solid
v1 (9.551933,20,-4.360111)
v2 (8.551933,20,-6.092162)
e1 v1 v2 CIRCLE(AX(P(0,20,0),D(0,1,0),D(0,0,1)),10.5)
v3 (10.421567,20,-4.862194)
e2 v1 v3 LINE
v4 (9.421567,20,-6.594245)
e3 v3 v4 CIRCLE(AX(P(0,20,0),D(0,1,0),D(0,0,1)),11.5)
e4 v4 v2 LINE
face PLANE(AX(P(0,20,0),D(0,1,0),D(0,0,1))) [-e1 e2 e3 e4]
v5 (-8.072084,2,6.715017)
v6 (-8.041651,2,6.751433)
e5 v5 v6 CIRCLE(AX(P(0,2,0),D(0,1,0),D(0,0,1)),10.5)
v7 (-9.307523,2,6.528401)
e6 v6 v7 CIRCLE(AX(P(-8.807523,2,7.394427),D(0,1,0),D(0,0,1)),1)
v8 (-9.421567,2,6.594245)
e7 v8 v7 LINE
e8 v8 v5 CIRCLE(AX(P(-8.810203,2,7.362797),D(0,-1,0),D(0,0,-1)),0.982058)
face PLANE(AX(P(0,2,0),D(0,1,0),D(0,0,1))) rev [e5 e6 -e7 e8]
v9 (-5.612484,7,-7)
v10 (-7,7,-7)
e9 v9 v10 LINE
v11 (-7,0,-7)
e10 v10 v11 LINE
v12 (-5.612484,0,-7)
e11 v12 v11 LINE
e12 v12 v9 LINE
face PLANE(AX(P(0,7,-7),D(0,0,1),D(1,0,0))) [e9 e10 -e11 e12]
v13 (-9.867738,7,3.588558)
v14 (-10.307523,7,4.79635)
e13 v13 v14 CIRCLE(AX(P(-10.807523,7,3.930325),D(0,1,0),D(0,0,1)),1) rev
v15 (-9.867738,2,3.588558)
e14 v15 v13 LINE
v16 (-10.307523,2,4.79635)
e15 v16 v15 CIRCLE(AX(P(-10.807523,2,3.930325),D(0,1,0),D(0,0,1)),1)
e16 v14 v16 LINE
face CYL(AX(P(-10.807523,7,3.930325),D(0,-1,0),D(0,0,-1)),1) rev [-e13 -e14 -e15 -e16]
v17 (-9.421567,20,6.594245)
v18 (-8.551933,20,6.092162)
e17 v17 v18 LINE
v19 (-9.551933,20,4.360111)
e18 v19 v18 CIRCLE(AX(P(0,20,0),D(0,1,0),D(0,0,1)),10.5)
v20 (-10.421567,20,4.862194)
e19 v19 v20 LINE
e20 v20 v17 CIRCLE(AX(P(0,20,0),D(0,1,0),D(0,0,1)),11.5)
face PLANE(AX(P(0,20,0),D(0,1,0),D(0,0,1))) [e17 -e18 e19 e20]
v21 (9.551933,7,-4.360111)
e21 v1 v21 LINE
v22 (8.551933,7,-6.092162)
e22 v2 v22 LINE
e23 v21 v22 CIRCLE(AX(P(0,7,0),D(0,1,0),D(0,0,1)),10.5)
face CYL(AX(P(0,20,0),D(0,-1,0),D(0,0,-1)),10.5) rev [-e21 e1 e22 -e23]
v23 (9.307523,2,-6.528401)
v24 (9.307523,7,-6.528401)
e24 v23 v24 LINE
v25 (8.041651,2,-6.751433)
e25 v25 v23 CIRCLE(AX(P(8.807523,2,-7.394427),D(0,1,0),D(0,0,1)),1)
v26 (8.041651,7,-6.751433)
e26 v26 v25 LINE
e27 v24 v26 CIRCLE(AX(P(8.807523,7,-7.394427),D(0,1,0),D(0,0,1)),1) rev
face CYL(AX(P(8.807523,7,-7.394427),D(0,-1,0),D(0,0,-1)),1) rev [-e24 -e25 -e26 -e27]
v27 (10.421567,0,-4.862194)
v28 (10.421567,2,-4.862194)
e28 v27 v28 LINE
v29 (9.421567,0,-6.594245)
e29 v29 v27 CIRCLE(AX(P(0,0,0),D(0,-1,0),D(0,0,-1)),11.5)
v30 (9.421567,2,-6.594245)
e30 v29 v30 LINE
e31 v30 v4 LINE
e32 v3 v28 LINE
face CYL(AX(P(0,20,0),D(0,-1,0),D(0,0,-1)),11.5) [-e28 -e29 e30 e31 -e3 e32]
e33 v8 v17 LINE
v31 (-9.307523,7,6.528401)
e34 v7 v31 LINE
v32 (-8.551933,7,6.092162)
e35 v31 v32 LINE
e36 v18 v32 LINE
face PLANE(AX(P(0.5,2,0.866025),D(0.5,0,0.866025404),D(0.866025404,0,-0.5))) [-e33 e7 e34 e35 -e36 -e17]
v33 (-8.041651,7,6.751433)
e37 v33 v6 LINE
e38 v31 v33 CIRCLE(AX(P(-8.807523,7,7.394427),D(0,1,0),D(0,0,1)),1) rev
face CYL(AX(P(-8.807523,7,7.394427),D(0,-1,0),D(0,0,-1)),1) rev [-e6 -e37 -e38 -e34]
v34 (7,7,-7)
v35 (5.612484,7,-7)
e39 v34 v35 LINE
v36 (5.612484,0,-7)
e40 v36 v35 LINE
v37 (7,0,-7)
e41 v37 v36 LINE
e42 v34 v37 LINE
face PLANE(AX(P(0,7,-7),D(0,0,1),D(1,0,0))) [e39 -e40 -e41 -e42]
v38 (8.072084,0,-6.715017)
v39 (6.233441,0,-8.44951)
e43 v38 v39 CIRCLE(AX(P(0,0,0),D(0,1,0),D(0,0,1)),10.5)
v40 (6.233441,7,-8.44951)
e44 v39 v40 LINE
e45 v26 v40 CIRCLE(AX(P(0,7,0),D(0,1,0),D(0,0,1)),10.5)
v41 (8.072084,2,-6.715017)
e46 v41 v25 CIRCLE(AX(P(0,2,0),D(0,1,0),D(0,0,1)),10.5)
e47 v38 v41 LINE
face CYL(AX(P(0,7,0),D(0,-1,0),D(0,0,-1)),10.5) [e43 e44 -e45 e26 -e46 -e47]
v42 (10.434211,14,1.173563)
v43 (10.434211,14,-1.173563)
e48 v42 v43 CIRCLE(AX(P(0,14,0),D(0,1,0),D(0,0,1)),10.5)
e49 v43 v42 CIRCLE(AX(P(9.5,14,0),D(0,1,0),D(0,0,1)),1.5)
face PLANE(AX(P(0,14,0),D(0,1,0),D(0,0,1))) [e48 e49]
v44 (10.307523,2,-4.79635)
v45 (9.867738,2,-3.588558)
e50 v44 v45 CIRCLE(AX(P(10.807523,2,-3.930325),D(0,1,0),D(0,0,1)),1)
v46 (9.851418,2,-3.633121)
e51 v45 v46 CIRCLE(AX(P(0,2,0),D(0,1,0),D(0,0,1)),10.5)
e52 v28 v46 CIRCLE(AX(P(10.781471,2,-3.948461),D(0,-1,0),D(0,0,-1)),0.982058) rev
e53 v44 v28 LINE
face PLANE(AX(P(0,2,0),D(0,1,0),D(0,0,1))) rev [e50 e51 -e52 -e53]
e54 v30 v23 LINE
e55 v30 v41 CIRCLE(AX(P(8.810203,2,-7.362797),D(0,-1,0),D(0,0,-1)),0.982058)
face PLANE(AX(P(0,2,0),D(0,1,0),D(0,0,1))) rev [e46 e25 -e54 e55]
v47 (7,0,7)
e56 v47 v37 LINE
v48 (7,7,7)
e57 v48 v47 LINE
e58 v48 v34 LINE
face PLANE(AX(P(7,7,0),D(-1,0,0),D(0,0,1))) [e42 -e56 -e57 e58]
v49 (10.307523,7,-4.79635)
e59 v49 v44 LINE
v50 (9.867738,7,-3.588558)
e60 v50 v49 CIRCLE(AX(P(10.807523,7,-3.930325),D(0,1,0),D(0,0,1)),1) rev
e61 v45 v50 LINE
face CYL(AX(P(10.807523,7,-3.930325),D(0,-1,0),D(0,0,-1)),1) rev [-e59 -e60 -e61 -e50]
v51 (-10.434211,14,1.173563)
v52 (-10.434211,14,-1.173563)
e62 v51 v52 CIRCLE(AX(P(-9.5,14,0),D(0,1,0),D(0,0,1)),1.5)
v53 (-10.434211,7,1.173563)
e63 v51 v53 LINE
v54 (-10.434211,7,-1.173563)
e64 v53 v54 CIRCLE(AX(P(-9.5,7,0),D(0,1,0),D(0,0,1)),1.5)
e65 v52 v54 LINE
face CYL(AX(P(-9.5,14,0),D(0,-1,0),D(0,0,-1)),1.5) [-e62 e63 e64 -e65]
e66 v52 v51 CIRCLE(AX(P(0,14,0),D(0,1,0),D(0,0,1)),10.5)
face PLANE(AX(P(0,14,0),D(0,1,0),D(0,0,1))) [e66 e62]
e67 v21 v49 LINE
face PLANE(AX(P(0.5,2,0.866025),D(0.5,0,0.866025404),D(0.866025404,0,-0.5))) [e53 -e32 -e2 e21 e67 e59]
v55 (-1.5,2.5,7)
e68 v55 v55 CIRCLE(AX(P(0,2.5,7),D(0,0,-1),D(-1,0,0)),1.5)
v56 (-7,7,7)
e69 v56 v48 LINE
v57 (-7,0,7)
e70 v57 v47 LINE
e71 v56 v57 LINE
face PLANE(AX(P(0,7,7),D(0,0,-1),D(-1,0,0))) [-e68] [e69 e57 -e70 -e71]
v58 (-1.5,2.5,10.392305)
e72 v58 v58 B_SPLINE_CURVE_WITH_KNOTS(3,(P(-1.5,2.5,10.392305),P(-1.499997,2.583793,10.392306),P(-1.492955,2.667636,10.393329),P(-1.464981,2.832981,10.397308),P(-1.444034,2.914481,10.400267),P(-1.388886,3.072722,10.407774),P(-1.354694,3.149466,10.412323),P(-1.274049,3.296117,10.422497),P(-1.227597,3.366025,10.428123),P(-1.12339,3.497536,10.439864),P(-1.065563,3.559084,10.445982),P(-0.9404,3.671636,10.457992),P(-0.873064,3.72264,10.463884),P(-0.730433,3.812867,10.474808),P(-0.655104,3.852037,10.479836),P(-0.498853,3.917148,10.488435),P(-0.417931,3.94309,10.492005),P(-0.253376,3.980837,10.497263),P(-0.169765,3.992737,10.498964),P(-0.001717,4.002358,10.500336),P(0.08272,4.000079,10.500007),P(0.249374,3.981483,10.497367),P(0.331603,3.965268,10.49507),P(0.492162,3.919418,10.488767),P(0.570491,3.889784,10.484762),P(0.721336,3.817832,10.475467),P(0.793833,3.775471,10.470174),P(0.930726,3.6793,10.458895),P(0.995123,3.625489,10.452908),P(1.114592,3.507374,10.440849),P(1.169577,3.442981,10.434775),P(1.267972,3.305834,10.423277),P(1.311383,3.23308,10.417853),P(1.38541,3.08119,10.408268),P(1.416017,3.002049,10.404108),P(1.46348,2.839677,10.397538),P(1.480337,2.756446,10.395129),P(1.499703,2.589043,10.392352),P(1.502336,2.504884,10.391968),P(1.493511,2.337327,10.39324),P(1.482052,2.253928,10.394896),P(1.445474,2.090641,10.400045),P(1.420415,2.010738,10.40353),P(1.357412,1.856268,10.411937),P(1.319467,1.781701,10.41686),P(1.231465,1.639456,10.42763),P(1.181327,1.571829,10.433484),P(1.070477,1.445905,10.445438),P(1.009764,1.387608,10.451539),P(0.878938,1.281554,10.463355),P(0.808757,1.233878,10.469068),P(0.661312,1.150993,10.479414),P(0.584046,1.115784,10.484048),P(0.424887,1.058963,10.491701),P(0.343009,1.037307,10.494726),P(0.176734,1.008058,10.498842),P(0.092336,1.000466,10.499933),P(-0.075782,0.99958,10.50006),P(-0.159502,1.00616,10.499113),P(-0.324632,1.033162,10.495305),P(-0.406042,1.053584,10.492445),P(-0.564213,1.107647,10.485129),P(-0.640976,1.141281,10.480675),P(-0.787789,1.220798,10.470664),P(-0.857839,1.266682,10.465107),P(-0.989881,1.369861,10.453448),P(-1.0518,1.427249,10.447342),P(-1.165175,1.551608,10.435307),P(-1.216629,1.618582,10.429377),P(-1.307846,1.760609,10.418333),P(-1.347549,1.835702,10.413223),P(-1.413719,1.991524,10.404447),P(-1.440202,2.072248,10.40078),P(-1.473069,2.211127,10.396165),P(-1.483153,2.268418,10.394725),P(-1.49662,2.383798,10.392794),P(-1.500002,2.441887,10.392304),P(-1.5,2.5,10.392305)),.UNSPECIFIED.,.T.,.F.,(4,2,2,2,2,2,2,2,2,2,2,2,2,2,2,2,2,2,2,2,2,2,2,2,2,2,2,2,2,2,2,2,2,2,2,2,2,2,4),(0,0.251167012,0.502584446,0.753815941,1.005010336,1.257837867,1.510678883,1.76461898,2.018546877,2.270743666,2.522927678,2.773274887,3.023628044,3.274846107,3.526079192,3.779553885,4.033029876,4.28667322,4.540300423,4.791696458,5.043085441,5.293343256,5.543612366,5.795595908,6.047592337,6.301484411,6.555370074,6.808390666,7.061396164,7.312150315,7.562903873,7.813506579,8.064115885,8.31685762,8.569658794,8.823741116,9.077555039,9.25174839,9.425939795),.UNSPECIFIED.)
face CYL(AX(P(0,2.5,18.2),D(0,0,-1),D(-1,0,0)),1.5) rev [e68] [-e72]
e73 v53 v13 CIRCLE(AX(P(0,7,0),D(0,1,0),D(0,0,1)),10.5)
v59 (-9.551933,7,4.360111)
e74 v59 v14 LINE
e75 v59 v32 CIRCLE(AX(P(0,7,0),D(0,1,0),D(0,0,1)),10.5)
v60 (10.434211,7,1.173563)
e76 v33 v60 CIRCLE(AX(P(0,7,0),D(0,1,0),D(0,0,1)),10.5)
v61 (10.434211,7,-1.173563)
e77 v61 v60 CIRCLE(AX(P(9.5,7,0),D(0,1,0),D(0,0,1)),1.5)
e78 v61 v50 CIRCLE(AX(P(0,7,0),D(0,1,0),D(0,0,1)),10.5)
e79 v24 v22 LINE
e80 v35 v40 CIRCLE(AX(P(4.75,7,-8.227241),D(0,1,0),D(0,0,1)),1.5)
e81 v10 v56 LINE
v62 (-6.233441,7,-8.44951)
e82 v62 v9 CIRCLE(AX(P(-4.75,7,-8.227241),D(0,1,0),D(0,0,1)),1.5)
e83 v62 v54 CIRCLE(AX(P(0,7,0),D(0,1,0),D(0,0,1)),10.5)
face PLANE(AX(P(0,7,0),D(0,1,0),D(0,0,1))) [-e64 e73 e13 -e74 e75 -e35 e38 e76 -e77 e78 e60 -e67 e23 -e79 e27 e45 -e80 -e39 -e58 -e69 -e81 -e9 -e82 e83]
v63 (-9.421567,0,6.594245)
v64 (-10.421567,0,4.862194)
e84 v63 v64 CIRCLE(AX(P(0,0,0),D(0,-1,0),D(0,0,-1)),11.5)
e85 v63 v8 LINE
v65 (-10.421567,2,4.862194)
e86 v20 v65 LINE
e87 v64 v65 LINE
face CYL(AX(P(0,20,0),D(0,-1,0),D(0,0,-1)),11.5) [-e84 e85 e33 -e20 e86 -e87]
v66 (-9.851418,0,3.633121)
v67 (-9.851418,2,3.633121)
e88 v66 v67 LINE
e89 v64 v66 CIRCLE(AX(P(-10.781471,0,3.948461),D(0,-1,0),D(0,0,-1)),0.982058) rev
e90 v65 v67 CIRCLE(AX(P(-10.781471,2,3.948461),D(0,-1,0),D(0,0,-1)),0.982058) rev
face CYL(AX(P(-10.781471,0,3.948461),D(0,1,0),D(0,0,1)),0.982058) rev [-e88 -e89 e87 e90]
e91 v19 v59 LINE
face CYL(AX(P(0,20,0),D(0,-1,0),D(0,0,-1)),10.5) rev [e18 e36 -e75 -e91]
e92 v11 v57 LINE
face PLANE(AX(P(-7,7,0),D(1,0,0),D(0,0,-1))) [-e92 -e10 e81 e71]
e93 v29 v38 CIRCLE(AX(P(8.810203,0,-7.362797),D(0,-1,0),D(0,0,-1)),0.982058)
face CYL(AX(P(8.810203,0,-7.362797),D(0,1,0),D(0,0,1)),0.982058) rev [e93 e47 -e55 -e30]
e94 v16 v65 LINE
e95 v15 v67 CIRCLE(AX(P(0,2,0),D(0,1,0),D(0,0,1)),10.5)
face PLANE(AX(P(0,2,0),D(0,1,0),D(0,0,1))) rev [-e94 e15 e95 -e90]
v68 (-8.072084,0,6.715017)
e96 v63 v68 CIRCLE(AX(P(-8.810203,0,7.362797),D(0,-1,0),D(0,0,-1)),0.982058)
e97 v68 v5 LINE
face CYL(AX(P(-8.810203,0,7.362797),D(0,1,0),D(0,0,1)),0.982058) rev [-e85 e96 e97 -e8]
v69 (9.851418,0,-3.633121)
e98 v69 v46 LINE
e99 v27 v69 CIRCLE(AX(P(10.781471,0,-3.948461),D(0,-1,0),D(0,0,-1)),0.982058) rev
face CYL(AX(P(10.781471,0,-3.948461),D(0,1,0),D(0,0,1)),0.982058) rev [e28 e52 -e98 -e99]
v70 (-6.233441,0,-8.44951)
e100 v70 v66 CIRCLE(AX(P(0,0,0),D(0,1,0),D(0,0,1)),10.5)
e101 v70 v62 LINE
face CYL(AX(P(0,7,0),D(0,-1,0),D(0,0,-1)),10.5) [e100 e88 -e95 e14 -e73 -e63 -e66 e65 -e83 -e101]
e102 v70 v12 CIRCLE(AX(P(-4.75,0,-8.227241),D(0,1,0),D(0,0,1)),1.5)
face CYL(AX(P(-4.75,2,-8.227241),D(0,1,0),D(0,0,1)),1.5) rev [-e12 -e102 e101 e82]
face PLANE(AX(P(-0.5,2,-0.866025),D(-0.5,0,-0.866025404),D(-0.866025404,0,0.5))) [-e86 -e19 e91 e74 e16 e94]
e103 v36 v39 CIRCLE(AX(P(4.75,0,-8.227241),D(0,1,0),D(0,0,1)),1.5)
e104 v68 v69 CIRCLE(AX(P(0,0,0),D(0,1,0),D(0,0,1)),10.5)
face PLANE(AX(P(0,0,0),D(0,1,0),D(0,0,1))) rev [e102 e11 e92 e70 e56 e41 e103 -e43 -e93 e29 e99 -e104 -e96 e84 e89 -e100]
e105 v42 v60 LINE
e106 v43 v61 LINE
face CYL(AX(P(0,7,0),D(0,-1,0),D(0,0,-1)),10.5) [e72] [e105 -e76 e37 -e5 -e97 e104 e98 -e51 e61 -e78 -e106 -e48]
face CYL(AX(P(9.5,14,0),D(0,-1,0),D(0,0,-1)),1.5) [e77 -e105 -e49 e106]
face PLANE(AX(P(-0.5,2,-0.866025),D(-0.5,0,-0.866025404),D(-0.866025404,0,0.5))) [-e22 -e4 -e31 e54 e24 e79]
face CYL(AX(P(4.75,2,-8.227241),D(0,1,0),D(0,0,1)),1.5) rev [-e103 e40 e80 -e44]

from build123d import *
from build123d.topology import SkipClean

# Parameters (mm, degrees)
SKETCH1_R               = 10.5
BOSS_EXTRUDE1_DEPTH     = 7
BOSS_EXTRUDE2_DEPTH     = 7
BOSS_EXTRUDE4_START     = -5
BOSS_EXTRUDE4_DEPTH     = 5
SKETCH5_R               = 1.5
CUT_EXTRUDE2_DEPTH      = 5
BOSS_EXTRUDE5_DEPTH     = 13
CUT_EXTRUDE4_DEPTH      = 26.013546021
CUT_EXTRUDE4_DEPTH_BACK = 26.013546021
FILLET1_R               = 1
CUT_EXTRUDE5_DEPTH      = 20.866491554
CUT_EXTRUDE5_DEPTH_BACK = 20.866491554
SKETCH9_R               = 15
SKETCH9_R_2             = 11.5
SKETCH10_R              = 1.5
CUT_EXTRUDE6_DEPTH      = 11.2
CUT_EXTRUDE7_DEPTH      = 24.334523869
CUT_EXTRUDE7_DEPTH_BACK = 24.334523869
SKETCH12_R              = 4.652991158
SKETCH12_R_2            = 1.5
BOSS_EXTRUDE6_START     = 2
BOSS_EXTRUDE6_DEPTH     = 2


with BuildPart() as part:
    # Sketch1 → Boss-Extrude1 (new body)
    with BuildSketch(Plane(origin=(0, 0, 0), x_dir=(1, 0, 0), z_dir=(0, 1, 0))):
        with Locations(Location((0, 0, 0), (0, 0, 270))):
            Circle(SKETCH1_R)
        Polygon((7, -7), (7, 0), (7, 7), (-7, 7), (-7, -7), align=None, mode=Mode.SUBTRACT)
    extrude(amount=BOSS_EXTRUDE1_DEPTH)

    # Sketch2 → Boss-Extrude2 (add)
    with BuildSketch(Plane(origin=(0, 7, 0), x_dir=(1, 0, 0), z_dir=(0, 1, 0))):
        with BuildLine():
            ThreePointArc((-10.434210526, -1.173563246), (-8.848584537, -1.351169084), (-8, 0))
            ThreePointArc((-8, 0), (-8.848584537, 1.351169084), (-10.434210526, 1.173563246))
            ThreePointArc((-10.434210526, 1.173563246), (-10.5, 0), (-10.434210526, -1.173563246))
        make_face()
        with BuildLine():
            ThreePointArc((10.434210526, 1.173563246), (8.848584537, 1.351169084), (8, 0))
            ThreePointArc((8, 0), (8.848584537, -1.351169084), (10.434210526, -1.173563246))
            ThreePointArc((10.434210526, -1.173563246), (10.5, 0), (10.434210526, 1.173563246))
        make_face()
    extrude(amount=BOSS_EXTRUDE2_DEPTH)

    # Sketch4 → Boss-Extrude4 (add)
    with BuildSketch(Plane(origin=(0, 7, 0), x_dir=(1, 0, 0), z_dir=(0, 1, 0)).offset(BOSS_EXTRUDE4_START)):
        with BuildLine():
            Line((-10.392304845, -6), (-9.09326674, -5.25))
            ThreePointArc((-9.09326674, -5.25), (-9.333212128, -4.810525062), (-9.551933495, -4.360110836))
            Line((-9.551933495, -4.360110836), (-10.743718377, -5.048188159))
            ThreePointArc((-10.743718377, -5.048188159), (-10.608541774, -5.539058011), (-10.392304845, -6))
        make_face()
        with BuildLine():
            Line((-9.09326674, -5.25), (-7, -4.041451884))
            Line((-7, -4.041451884), (-7, -2.886751346))
            Line((-7, -2.886751346), (-9.551933495, -4.360110836))
            ThreePointArc((-9.551933495, -4.360110836), (-9.333212128, -4.810525062), (-9.09326674, -5.25))
        make_face()
        with BuildLine():
            Line((-7, -5.196152423), (-7, -4.041451884))
            Line((-7, -4.041451884), (-9.09326674, -5.25))
            ThreePointArc((-9.09326674, -5.25), (-8.832642973, -5.677536271), (-8.551933495, -6.092161644))
            Line((-8.551933495, -6.092161644), (-7, -5.196152423))
        make_face()
        with BuildLine():
            ThreePointArc((-8.551933495, -6.092161644), (-8.832642973, -5.677536271), (-9.09326674, -5.25))
            Line((-9.09326674, -5.25), (-10.392304845, -6))
            ThreePointArc((-10.392304845, -6), (-10.101235838, -6.417737668), (-9.743718377, -6.780238966))
            Line((-9.743718377, -6.780238966), (-8.551933495, -6.092161644))
        make_face()
        with BuildLine():
            ThreePointArc((8.551933495, 6.092161644), (8.832642973, 5.677536271), (9.09326674, 5.25))
            Line((9.09326674, 5.25), (10.392304845, 6))
            ThreePointArc((10.392304845, 6), (10.101235838, 6.417737668), (9.743718377, 6.780238966))
            Line((9.743718377, 6.780238966), (8.551933495, 6.092161644))
        make_face()
        with BuildLine():
            Line((10.392304845, 6), (9.09326674, 5.25))
            ThreePointArc((9.09326674, 5.25), (9.333212128, 4.810525062), (9.551933495, 4.360110836))
            Line((9.551933495, 4.360110836), (10.743718377, 5.048188159))
            ThreePointArc((10.743718377, 5.048188159), (10.608541774, 5.539058011), (10.392304845, 6))
        make_face()
        with BuildLine():
            Line((7, 5.196152423), (7, 4.041451884))
            Line((7, 4.041451884), (9.09326674, 5.25))
            ThreePointArc((9.09326674, 5.25), (8.832642973, 5.677536271), (8.551933495, 6.092161644))
            Line((8.551933495, 6.092161644), (7, 5.196152423))
        make_face()
        with BuildLine():
            Line((9.09326674, 5.25), (7, 4.041451884))
            Line((7, 4.041451884), (7, 2.886751346))
            Line((7, 2.886751346), (9.551933495, 4.360110836))
            ThreePointArc((9.551933495, 4.360110836), (9.333212128, 4.810525062), (9.09326674, 5.25))
        make_face()
    extrude(amount=BOSS_EXTRUDE4_DEPTH)

    # Sketch5 → Cut-Extrude2 (cut)
    with BuildSketch(Plane(origin=(0, 7, 0), x_dir=(1, 0, 0), z_dir=(0, 1, 0))):
        with Locations((4.75, 8.227241336)):
            Circle(SKETCH5_R)
        with Locations((-4.75, 8.227241336)):
            Circle(SKETCH5_R)
    extrude(amount=-CUT_EXTRUDE2_DEPTH, mode=Mode.SUBTRACT)

    # Sketch6 → Boss-Extrude5 (add)
    with BuildSketch(Plane(origin=(0, 7, 0), x_dir=(1, 0, 0), z_dir=(0, 1, 0))):
        with BuildLine():
            Line((-9.551933495, -4.360110836), (-10.743718377, -5.048188159))
            ThreePointArc((-10.743718377, -5.048188159), (-10.392304845, -6), (-9.743718377, -6.780238966))
            Line((-9.743718377, -6.780238966), (-8.551933495, -6.092161644))
            ThreePointArc((-8.551933495, -6.092161644), (-9.09326674, -5.25), (-9.551933495, -4.360110836))
        make_face()
        with BuildLine():
            Line((9.743718377, 6.780238966), (8.551933495, 6.092161644))
            ThreePointArc((8.551933495, 6.092161644), (9.09326674, 5.25), (9.551933495, 4.360110836))
            Line((9.551933495, 4.360110836), (10.743718377, 5.048188159))
            ThreePointArc((10.743718377, 5.048188159), (10.392304845, 6), (9.743718377, 6.780238966))
        make_face()
    extrude(amount=BOSS_EXTRUDE5_DEPTH)

    # Sketch8 → Cut-Extrude4 (cut, two sides: drawn at the far end of the back side and taken through both)
    with BuildSketch(Plane.XY.offset(-CUT_EXTRUDE4_DEPTH_BACK)):
        with BuildLine():
            ThreePointArc((-1.216007768, 2.789525659), (-0.289525659, 1.283992232), (1.216007768, 2.210474341))
            Line((1.216007768, 2.210474341), (-1.216007768, 2.789525659))
        make_face()
        with BuildLine():
            Line((-1.216007768, 2.789525659), (1.216007768, 2.210474341))
            ThreePointArc((1.216007768, 2.210474341), (1.241472857, 2.354242857), (1.25, 2.5))
            ThreePointArc((1.25, 2.5), (0.145757143, 3.741472857), (-1.216007768, 2.789525659))
        make_face()
    extrude(amount=CUT_EXTRUDE4_DEPTH + CUT_EXTRUDE4_DEPTH_BACK, mode=Mode.SUBTRACT)

    # Fillet1
    fillet1_edges = [part.edges().sort_by_distance(p)[0] for p in [
        (-8.551933495, 4.5, 6.092161644),
        (-9.551933495, 4.5, 4.360110836),
        (8.551933495, 4.5, -6.092161644),
        (9.551933495, 4.5, -4.360110836),
    ]]
    fillet(fillet1_edges, radius=FILLET1_R)

    # Sketch9 → Cut-Extrude5 (cut, two sides: drawn at the far end of the back side and taken through both)
    with BuildSketch(Plane(origin=(0, 7, 0), x_dir=(1, 0, 0), z_dir=(0, 1, 0)).offset(-CUT_EXTRUDE5_DEPTH_BACK)):
        Circle(SKETCH9_R)
        Circle(SKETCH9_R_2, mode=Mode.SUBTRACT)
    extrude(amount=CUT_EXTRUDE5_DEPTH + CUT_EXTRUDE5_DEPTH_BACK, mode=Mode.SUBTRACT)

    # Sketch10 → Cut-Extrude6 (cut)
    with BuildSketch(Plane(origin=(0, 0, 7), x_dir=(-1, 0, 0), z_dir=(0, 0, -1))):
        with Locations((0, 2.5)):
            Circle(SKETCH10_R)
    extrude(amount=-CUT_EXTRUDE6_DEPTH, mode=Mode.SUBTRACT)

    # Sketch12 → Cut-Extrude7 (cut, two sides: drawn at the far end of the back side and taken through both)
    with BuildSketch(Plane(origin=(0, 2, 0), x_dir=(1, 0, 0), z_dir=(0, 1, 0)).offset(-CUT_EXTRUDE7_DEPTH_BACK)):
        with Locations((-0.127828636, 8.405111083)):
            Circle(SKETCH12_R)
        with Locations((-4.75, 8.227241336)):
            Circle(SKETCH12_R_2)
        with BuildLine():
            ThreePointArc((4.200769679, 9.623073007), (4.274324476, 9.649820963), (4.349174329, 9.67269586))
            ThreePointArc((4.349174329, 9.67269586), (-0.103811825, 13.058040258), (-4.591507729, 9.718844567))
            ThreePointArc((-4.591507729, 9.718844567), (-3.634711157, 9.23030205), (-3.25, 8.227241336))
            ThreePointArc((-3.25, 8.227241336), (-3.596964938, 7.267809136), (-4.477346862, 6.752229381))
            ThreePointArc((-4.477346862, 6.752229381), (-0.09444048, 3.752239717), (4.244962013, 6.814819079))
            ThreePointArc((4.244962013, 6.814819079), (4.059998471, 6.895363755), (3.887515969, 7))
            ThreePointArc((3.887515969, 7), (3.260583217, 8.405111083), (4.200769679, 9.623073007))
        make_face()
        with BuildLine():
            ThreePointArc((4.525162522, 8.405111083), (4.489847577, 8.977293846), (4.384438802, 9.540791183))
            ThreePointArc((4.384438802, 9.540791183), (4.292801386, 9.582372162), (4.200769679, 9.623073007))
            ThreePointArc((4.200769679, 9.623073007), (3.260583217, 8.405111083), (3.887515969, 7))
            Line((3.887515969, 7), (4.307933932, 7))
            ThreePointArc((4.307933932, 7), (4.470534699, 7.694209294), (4.525162522, 8.405111083))
        make_face()
        with BuildLine():
            ThreePointArc((5.612484031, 7), (6.081113452, 7.535766841), (6.25, 8.227241336))
            ThreePointArc((6.25, 8.227241336), (6.245854483, 8.338683539), (6.233440847, 8.449509761))
            ThreePointArc((6.233440847, 8.449509761), (5.336906018, 9.04253472), (4.384438802, 9.540791183))
            ThreePointArc((4.384438802, 9.540791183), (4.489847577, 8.977293846), (4.525162522, 8.405111083))
            ThreePointArc((4.525162522, 8.405111083), (4.470534699, 7.694209294), (4.307933932, 7))
            Line((4.307933932, 7), (5.612484031, 7))
        make_face()
    extrude(amount=CUT_EXTRUDE7_DEPTH + CUT_EXTRUDE7_DEPTH_BACK, mode=Mode.SUBTRACT)

    # Sketch13 → Boss-Extrude6 (add)
    with SkipClean():  # the faces are left unmerged after this step: merging them gives an invalid solid
        with BuildSketch(Plane.XZ.offset(-2).offset(BOSS_EXTRUDE6_START)):
            with BuildLine():
                ThreePointArc((9.421567416, -6.594245022), (9.699619412, -6.177975661), (9.959292144, -5.75))
                Line((9.959292144, -5.75), (9.09326674, -5.25))
                ThreePointArc((9.09326674, -5.25), (8.613877566, -6.004257929), (8.07208415, -6.715017311))
                ThreePointArc((8.07208415, -6.715017311), (8.722663603, -6.384648227), (9.421567416, -6.594245022))
            make_face()
            with BuildLine():
                Line((9.09326674, -5.25), (9.959292144, -5.75))
                ThreePointArc((9.959292144, -5.75), (10.200093572, -5.311128987), (10.421567416, -4.862194215))
                ThreePointArc((10.421567416, -4.862194215), (9.890599361, -4.361724155), (9.851417653, -3.63312128))
                ThreePointArc((9.851417653, -3.63312128), (9.506778681, -4.457707832), (9.09326674, -5.25))
            make_face()
            with BuildLine():
                ThreePointArc((-10.421567416, 4.862194215), (-9.890599361, 4.361724155), (-9.851417653, 3.63312128))
                ThreePointArc((-9.851417653, 3.63312128), (-9.09326674, 5.25), (-8.07208415, 6.715017311))
                ThreePointArc((-8.07208415, 6.715017311), (-8.722663603, 6.384648227), (-9.421567416, 6.594245022))
                ThreePointArc((-9.421567416, 6.594245022), (-9.959292144, 5.75), (-10.421567416, 4.862194215))
            make_face()
        extrude(amount=-BOSS_EXTRUDE6_DEPTH)


solid = part.part
